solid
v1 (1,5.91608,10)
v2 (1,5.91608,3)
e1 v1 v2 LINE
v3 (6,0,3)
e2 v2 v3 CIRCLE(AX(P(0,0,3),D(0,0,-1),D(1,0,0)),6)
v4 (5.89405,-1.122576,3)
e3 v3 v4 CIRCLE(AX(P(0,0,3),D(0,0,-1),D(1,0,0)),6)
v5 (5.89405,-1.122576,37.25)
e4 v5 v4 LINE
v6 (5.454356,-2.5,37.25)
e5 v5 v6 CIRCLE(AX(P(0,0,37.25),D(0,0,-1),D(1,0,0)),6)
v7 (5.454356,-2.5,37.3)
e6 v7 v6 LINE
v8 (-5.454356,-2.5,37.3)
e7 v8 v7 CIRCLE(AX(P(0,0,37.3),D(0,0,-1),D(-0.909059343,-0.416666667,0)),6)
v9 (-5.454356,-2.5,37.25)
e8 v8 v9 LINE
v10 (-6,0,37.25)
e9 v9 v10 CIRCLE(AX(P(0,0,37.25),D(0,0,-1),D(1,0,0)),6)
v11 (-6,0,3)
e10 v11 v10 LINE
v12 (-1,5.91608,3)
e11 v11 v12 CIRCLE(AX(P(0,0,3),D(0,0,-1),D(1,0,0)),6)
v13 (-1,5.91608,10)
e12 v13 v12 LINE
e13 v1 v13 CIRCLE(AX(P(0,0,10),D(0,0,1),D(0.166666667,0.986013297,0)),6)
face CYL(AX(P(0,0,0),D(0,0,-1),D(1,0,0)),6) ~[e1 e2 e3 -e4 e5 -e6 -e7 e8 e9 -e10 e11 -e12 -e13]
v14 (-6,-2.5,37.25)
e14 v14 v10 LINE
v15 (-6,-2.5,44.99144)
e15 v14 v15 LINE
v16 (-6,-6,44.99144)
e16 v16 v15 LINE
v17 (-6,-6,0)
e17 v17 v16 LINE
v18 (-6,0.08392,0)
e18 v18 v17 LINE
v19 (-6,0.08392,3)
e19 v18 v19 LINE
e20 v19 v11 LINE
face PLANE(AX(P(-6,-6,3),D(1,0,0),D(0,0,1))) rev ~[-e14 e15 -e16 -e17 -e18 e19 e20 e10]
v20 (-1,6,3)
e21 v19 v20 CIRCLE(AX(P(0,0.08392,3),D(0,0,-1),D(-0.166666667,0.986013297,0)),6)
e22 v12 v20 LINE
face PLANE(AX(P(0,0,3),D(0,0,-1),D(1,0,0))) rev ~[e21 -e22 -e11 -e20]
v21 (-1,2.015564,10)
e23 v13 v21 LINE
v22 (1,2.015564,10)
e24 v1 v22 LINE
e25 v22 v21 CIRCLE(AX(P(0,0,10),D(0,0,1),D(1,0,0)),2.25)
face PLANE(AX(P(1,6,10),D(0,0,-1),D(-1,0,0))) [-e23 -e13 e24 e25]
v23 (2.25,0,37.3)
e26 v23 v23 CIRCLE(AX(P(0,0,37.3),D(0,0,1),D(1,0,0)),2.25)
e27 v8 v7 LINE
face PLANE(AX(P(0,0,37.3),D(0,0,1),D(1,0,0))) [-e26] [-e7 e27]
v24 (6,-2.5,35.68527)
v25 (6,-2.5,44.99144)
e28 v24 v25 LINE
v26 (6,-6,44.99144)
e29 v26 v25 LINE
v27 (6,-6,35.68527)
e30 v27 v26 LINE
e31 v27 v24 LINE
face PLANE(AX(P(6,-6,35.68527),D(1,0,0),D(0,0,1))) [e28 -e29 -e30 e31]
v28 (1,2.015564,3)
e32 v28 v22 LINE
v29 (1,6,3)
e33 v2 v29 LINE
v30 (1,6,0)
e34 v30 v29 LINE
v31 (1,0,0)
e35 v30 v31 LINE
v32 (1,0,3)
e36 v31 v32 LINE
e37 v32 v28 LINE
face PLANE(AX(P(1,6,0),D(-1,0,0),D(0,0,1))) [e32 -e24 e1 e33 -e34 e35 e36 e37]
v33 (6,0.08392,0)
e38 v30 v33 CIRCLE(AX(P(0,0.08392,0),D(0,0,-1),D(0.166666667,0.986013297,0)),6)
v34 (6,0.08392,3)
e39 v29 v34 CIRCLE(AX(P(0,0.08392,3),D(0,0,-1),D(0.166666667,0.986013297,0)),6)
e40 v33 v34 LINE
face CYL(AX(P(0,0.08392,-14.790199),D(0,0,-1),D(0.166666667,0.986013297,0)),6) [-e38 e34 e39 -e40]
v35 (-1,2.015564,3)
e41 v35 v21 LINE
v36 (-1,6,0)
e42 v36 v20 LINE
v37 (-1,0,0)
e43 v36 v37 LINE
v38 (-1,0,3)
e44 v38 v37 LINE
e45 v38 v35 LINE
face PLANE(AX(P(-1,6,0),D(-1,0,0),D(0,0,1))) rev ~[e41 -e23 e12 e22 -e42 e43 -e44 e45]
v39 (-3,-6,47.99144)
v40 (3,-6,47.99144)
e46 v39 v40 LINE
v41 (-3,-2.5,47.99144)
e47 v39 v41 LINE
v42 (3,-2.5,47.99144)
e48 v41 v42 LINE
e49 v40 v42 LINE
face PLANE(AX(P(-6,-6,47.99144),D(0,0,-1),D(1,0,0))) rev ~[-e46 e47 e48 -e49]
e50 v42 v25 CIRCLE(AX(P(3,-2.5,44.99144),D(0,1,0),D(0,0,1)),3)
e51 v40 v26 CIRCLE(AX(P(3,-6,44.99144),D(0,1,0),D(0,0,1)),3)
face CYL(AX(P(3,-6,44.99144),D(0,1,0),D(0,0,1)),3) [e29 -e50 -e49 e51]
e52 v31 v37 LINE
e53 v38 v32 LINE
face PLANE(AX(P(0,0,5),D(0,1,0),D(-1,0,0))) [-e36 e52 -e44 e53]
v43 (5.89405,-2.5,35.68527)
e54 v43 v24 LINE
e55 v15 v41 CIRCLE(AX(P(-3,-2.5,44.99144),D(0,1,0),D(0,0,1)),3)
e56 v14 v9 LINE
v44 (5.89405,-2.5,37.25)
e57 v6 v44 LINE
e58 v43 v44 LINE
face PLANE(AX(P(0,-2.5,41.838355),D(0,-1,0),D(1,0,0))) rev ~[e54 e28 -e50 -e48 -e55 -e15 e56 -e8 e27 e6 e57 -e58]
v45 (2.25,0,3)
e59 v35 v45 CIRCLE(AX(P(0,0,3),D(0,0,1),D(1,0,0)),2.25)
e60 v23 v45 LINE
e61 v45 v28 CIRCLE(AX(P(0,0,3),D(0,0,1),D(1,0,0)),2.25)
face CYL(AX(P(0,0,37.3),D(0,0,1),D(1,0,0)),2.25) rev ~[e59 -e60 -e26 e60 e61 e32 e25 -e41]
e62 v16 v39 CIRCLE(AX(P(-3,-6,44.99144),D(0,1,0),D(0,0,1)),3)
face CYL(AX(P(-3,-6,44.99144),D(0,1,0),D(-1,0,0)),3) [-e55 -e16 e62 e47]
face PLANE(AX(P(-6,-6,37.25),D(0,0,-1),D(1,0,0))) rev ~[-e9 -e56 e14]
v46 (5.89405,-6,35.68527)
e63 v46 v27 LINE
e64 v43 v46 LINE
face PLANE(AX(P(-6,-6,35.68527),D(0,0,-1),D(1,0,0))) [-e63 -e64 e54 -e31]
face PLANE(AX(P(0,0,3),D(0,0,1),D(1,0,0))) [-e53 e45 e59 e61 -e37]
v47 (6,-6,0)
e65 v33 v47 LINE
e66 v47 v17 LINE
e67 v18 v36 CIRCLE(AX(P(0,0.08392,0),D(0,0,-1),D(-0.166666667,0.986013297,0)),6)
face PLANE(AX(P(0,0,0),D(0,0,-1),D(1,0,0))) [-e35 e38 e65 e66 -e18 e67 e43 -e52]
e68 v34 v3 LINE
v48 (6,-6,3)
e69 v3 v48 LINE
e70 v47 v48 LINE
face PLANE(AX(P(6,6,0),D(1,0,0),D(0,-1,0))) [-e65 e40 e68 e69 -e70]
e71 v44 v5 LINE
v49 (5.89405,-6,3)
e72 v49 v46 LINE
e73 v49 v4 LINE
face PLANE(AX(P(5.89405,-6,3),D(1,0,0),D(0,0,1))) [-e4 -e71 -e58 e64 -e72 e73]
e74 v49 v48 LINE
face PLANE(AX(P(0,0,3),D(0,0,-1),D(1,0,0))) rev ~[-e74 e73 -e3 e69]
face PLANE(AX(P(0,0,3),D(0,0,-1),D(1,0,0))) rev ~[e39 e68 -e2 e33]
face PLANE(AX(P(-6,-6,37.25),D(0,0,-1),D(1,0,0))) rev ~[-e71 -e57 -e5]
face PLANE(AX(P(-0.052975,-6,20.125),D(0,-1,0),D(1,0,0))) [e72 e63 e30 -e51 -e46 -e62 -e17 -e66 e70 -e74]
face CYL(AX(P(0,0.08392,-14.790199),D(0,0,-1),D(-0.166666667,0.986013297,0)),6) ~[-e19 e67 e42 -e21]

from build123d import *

# Parameters (mm, degrees)
F0_R        = 6
F1_DEPTH    = 37.3
F2_W        = 12
F2_H        = 12
F3_DEPTH    = 3
F4_W        = 12
F4_H        = 12.3061701586
F5_DEPTH    = 3.5
F6_W        = 2
F6_H        = 10
F7_DEPTH    = 6
F8_T1_DEPTH = 32.5803989155
F9_W        = 11.8940497642
F9_H        = 34.25
F10_DEPTH   = 6
F11_R       = 2.25
F12_DEPTH   = 34.3
F13_R       = 3


# Not quite as in the source:
# - a fillet or chamfer that OpenCascade refuses, or shapes differently, is made with other operations: its cross-section is extruded or revolved along the edge and cut away or added


with BuildPart() as f1:
    # F0 (on Top) → F1 (new body)
    with BuildSketch(Plane.XY):
        Circle(F0_R)
    extrude(amount=F1_DEPTH)

    # F2 (on face) → F3 (join)
    with BuildSketch(Plane(origin=(0, 0, 0), x_dir=(1, 0, 0), z_dir=(0, 0, -1))):
        Rectangle(F2_W, F2_H)
    extrude(amount=-F3_DEPTH)

    # F4 (on face) → F5 (join)
    with BuildSketch(Plane.XZ.offset(6)):
        with Locations((0, 41.8383553624)):
            Rectangle(F4_W, F4_H)
    extrude(amount=-F5_DEPTH)

    # F6 (on face) → F7 (cut)
    with BuildSketch(Plane(origin=(0, 6, 0), x_dir=(-1, 0, 0), z_dir=(0, 1, 0))):
        with Locations((0, 5)):
            Rectangle(F6_W, F6_H)
    extrude(amount=-F7_DEPTH, mode=Mode.SUBTRACT)

    # F8: fillet of radius 6 on 2 edges, made by hand

    # F8_s2 → F8_t1 (cut)
    with BuildSketch(Plane.XY.offset(-14.7901994578)):
        with BuildLine():
            ThreePointArc((-1, 6), (-4.582575695, 3.9569035631), (-6, 0.0839202169))
            Line((-6, 0.0839202169), (-6, 6))
            Line((-6, 6), (-1, 6))
        make_face()
        with BuildLine():
            ThreePointArc((1, 6), (4.582575695, 3.9569035631), (6, 0.0839202169))
            Line((6, 0.0839202169), (6, 6))
            Line((6, 6), (1, 6))
        make_face()
    extrude(amount=F8_T1_DEPTH, mode=Mode.SUBTRACT)

    # F9 (on face) → F10 (join)
    with BuildSketch(Plane.XZ.offset(6)):
        with Locations((-0.0529751179, 20.125)):
            Rectangle(F9_W, F9_H)
    extrude(amount=-F10_DEPTH)

    # F11 (on face) → F12 (cut)
    with BuildSketch(Plane.XY.offset(37.3)):
        Circle(F11_R)
    extrude(amount=-F12_DEPTH, mode=Mode.SUBTRACT)

    # F13
    f13_edges = [f1.edges().sort_by_distance(p)[0] for p in [
        (6, -4.25, 47.99144),
        (-6, -4.25, 47.99144),
    ]]
    fillet(f13_edges, radius=F13_R)


solid = f1.part
